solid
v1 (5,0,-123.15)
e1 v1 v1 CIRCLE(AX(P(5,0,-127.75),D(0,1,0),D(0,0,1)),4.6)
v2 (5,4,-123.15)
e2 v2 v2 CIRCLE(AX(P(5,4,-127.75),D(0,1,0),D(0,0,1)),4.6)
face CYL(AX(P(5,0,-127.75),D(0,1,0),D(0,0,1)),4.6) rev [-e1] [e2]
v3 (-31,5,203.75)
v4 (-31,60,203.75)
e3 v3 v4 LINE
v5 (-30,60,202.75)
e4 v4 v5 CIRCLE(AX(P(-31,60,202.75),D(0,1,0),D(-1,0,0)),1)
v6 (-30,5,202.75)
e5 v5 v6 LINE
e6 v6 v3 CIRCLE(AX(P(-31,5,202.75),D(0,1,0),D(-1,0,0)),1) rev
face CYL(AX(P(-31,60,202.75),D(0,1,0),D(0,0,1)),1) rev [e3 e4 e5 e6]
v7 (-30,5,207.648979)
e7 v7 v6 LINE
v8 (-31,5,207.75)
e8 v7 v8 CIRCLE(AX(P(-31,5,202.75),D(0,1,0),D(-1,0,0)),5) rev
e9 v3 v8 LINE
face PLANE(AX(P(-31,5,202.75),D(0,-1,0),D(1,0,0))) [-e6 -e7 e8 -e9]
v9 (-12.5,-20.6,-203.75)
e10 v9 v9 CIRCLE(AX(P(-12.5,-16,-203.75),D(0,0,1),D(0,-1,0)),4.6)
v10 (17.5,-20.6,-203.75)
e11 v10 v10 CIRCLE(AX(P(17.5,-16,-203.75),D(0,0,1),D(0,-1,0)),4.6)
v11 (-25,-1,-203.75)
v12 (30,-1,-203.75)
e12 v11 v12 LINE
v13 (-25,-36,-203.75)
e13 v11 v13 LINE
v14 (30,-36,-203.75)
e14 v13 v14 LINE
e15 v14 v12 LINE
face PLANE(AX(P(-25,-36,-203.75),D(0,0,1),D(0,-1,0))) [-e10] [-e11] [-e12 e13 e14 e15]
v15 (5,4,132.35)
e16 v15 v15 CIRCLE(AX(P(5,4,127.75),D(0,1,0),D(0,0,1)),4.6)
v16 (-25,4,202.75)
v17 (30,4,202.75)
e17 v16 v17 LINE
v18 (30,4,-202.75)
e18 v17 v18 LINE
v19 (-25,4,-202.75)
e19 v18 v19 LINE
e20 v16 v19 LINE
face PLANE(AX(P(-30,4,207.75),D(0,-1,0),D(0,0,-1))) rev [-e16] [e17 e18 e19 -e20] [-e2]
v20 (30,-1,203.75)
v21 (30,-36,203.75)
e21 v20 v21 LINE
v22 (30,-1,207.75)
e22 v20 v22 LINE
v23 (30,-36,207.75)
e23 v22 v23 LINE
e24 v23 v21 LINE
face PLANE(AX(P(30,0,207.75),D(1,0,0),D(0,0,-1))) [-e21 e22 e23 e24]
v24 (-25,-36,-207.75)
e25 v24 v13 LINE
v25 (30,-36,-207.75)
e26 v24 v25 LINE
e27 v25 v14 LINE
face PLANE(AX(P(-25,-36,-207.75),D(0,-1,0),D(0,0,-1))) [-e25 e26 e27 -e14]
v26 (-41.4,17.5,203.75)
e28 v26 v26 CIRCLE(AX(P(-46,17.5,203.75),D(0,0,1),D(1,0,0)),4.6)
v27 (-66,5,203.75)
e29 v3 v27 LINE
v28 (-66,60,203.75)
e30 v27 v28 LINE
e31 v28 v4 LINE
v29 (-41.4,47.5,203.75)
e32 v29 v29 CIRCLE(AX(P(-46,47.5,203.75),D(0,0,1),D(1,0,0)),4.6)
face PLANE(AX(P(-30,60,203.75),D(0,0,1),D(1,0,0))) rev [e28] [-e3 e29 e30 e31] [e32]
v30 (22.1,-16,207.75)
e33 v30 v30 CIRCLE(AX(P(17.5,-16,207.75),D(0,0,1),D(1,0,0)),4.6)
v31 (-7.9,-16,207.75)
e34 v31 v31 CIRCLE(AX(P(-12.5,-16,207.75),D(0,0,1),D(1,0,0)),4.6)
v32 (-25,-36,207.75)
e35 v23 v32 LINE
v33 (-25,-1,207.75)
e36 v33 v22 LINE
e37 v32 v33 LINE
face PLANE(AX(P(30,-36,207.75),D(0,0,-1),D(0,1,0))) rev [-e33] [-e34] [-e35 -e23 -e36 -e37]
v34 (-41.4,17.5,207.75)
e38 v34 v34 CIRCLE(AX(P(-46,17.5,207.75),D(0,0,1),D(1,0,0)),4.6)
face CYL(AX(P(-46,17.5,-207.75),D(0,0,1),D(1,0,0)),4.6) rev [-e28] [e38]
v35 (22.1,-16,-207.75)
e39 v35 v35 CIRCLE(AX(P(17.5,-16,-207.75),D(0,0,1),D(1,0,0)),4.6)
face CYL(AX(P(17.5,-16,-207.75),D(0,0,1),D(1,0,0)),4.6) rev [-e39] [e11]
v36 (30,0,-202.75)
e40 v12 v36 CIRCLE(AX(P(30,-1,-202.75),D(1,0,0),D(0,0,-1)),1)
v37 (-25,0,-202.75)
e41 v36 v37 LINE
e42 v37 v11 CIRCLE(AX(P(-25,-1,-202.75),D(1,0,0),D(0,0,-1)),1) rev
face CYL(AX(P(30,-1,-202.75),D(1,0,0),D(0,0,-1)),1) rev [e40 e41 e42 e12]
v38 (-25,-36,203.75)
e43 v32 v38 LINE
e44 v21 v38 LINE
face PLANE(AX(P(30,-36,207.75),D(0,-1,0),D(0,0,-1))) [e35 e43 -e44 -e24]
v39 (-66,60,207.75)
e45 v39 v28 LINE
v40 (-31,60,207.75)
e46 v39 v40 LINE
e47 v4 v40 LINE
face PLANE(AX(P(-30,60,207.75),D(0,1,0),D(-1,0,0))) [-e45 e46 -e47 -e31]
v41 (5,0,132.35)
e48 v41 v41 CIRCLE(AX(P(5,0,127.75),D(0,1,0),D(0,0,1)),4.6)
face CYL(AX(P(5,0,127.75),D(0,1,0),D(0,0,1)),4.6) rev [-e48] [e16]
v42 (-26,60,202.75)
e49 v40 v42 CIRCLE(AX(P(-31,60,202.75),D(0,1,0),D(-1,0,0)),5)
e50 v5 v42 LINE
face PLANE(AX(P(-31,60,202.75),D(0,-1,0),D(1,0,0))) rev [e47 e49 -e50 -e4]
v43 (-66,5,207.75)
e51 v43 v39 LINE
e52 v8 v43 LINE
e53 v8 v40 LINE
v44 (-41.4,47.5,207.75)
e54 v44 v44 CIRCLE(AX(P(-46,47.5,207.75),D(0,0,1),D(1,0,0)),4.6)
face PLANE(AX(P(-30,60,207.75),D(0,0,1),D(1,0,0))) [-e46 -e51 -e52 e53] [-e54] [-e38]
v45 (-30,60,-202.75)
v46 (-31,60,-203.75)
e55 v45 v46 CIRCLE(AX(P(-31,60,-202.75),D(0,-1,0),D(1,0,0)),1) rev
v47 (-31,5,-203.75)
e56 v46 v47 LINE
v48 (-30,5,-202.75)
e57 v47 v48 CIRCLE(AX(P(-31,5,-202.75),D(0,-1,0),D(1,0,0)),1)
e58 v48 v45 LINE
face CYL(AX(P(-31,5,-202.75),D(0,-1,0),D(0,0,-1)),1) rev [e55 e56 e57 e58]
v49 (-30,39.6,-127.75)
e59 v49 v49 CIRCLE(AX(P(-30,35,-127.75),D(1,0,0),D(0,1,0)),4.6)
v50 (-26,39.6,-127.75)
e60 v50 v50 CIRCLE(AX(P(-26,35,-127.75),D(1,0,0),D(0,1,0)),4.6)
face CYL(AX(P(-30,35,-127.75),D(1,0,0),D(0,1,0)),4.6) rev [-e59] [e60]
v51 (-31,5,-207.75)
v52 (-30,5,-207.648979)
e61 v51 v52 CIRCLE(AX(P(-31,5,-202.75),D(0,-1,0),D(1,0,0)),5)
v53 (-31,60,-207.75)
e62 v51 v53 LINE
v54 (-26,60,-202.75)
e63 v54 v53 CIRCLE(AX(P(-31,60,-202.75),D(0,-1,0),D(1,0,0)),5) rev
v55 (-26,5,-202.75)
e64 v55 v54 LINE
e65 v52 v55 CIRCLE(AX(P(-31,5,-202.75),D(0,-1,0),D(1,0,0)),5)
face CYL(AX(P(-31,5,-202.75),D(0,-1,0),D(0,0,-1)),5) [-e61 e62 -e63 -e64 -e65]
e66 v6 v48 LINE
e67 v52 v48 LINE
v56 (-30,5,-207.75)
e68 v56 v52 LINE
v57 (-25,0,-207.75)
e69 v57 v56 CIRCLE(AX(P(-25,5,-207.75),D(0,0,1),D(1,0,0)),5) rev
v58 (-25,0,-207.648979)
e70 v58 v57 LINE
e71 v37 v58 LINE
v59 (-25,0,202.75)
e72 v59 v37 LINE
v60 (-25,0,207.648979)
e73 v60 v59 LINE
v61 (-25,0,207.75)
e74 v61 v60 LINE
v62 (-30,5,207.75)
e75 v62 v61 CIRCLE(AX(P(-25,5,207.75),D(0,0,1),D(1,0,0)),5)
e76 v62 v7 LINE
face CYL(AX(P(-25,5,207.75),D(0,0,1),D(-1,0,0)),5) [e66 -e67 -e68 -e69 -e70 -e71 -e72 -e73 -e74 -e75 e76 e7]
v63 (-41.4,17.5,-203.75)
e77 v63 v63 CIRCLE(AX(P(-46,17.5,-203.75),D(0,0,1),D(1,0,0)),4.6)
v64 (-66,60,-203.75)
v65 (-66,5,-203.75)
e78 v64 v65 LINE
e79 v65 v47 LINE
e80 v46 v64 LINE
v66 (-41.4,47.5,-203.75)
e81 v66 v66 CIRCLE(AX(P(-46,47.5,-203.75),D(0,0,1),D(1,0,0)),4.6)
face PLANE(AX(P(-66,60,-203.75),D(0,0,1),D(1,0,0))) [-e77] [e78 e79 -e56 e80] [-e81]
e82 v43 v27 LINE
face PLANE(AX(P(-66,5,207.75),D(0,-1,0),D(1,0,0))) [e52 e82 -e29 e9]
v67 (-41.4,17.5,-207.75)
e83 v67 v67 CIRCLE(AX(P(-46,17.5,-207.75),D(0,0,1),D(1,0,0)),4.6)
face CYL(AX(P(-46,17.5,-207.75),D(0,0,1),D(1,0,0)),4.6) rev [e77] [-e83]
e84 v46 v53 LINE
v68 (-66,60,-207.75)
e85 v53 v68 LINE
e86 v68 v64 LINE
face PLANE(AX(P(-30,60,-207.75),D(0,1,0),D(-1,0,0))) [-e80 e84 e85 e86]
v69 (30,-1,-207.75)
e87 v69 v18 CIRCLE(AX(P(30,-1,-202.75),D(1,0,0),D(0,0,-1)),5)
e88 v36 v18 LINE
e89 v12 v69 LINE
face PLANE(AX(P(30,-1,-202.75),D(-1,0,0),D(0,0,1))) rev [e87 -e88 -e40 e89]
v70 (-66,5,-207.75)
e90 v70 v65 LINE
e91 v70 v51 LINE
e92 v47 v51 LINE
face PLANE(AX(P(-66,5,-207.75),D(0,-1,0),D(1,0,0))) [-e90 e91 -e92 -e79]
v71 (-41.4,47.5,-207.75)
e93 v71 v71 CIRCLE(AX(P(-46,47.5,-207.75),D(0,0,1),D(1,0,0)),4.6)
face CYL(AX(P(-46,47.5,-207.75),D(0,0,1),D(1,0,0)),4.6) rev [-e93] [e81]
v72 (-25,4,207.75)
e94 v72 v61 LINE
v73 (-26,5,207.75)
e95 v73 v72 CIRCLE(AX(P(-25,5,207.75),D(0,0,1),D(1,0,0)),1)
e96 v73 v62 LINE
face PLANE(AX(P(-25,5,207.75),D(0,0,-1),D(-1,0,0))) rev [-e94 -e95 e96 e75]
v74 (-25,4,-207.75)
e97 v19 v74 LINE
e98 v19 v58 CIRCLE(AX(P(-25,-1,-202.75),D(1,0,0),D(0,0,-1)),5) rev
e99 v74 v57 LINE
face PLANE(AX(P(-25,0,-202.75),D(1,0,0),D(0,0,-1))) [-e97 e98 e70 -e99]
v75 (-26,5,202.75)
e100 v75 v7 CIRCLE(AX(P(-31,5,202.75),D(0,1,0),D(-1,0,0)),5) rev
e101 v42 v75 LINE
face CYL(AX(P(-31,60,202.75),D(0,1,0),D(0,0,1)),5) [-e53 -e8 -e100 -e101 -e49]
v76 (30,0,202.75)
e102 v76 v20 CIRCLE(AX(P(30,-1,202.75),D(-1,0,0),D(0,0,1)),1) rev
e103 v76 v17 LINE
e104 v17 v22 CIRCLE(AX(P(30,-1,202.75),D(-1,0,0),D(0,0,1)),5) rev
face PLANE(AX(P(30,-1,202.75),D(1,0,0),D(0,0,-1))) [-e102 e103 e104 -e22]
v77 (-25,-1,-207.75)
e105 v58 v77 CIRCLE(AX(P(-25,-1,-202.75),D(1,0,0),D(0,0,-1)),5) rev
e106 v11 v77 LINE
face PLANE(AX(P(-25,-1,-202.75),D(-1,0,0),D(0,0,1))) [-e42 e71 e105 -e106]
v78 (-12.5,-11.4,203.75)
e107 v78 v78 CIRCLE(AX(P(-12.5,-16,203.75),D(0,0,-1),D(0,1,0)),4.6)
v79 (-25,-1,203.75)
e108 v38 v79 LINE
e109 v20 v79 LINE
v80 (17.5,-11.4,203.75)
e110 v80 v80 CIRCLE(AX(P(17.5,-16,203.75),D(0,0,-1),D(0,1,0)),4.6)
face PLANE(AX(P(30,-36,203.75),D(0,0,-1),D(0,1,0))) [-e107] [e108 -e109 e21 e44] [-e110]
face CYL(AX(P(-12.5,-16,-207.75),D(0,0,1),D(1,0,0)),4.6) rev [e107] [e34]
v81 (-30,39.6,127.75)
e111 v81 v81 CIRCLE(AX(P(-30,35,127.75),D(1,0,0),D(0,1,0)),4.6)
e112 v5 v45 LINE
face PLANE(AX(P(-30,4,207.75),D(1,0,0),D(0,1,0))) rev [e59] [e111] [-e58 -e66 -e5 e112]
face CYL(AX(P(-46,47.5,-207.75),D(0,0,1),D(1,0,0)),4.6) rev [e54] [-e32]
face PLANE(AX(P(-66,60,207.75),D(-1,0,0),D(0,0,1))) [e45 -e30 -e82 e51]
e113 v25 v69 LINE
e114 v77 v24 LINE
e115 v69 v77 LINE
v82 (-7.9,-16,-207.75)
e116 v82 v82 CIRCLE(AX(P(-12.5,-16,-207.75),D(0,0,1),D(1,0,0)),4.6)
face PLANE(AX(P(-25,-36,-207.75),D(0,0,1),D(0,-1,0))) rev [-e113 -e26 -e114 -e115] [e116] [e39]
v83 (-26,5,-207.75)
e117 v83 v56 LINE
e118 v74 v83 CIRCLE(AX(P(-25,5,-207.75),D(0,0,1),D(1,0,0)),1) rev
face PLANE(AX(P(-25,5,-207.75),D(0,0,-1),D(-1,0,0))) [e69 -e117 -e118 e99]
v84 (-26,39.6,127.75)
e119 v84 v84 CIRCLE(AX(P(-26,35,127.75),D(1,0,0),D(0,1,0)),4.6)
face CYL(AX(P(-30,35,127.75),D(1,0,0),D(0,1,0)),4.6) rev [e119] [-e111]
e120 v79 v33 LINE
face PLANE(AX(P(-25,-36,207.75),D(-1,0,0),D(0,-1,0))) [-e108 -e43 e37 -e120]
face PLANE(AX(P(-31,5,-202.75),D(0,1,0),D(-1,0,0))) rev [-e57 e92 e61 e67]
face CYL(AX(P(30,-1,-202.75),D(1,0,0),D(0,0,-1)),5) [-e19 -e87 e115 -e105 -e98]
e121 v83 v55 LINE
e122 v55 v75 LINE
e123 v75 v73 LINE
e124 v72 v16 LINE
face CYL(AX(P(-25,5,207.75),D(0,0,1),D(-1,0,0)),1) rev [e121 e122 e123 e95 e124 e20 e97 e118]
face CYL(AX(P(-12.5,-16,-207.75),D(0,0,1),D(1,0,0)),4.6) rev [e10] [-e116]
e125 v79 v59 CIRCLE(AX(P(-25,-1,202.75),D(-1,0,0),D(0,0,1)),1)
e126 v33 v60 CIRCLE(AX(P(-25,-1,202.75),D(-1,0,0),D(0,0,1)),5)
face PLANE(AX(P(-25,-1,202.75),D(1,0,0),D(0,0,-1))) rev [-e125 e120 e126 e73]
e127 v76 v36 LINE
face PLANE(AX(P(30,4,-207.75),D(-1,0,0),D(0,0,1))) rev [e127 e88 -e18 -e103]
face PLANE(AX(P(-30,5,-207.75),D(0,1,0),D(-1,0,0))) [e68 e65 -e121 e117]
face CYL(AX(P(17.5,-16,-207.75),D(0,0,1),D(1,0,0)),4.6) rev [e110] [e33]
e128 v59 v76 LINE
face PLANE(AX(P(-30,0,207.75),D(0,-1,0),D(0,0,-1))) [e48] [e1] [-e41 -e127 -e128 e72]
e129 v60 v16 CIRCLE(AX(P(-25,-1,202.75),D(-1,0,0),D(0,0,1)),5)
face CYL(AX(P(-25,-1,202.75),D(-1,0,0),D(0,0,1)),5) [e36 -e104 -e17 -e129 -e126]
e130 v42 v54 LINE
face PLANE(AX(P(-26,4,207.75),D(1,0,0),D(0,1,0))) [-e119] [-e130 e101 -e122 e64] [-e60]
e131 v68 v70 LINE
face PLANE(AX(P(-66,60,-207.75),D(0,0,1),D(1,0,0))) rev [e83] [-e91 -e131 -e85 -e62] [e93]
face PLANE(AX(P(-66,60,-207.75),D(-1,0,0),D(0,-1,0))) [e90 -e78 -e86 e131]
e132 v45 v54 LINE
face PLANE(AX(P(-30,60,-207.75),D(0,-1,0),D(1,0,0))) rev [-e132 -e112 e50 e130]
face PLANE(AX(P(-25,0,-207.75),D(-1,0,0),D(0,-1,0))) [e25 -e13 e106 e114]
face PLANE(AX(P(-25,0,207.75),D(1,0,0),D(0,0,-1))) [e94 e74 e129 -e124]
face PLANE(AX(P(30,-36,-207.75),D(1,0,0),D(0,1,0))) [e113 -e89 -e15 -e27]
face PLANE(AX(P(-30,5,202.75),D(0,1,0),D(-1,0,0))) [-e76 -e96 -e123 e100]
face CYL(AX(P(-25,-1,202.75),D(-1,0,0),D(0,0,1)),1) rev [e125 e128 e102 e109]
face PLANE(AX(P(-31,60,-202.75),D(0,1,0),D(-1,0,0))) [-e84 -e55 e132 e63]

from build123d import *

# Parameters (mm, degrees)
SKETCH1_W                      = 60
SKETCH1_H                      = 415.5
BASE_FLANGE1_DEPTH             = 4
EDGE_FLANGE1_STRIP_W           = 18
EDGE_FLANGE1_STRIP_H           = 4
EDGE_FLANGE1_STRIP_CUT_DEPTH   = 415.5
EDGE_FLANGE1_DEPTH             = 415.5
EDGE_FLANGE2_STRIP_W           = 18
EDGE_FLANGE2_STRIP_H           = 4
EDGE_FLANGE2_STRIP_CUT_DEPTH   = 55
EDGE_FLANGE2_STRIP_2_W         = 18
EDGE_FLANGE2_STRIP_2_H         = 4
EDGE_FLANGE2_STRIP_CUT_2_DEPTH = 55
EDGE_FLANGE2_STRIP_3_W         = 18
EDGE_FLANGE2_STRIP_3_H         = 4
EDGE_FLANGE2_STRIP_CUT_3_DEPTH = 55
EDGE_FLANGE2_STRIP_4_W         = 18
EDGE_FLANGE2_STRIP_4_H         = 4
EDGE_FLANGE2_STRIP_CUT_4_DEPTH = 55
EDGE_FLANGE2_DEPTH             = 55
EDGE_FLANGE2_BEND_DEPTH        = 55
EDGE_FLANGE2_BEND_2_DEPTH      = 55
EDGE_FLANGE2_BEND_3_DEPTH      = 55
SKETCH18_R                     = 4.6
EXTRUDE1_DEPTH                 = 425.966175125
SKETCH19_R                     = 4.6
EXTRUDE2_DEPTH                 = 4
SKETCH20_R                     = 4.6
EXTRUDE3_DEPTH                 = 4


# Sheet-metal steps are written as plain solids
with BuildPart() as part:
    # Sketch1 → Base-Flange1 (new body)
    with BuildSketch(Plane(origin=(0, 0, 0), x_dir=(1, 0, 0), z_dir=(0, 1, 0))):
        Rectangle(SKETCH1_W, SKETCH1_H)
    extrude(amount=BASE_FLANGE1_DEPTH)

    # Edge-Flange1 strip (across the edge) → Edge-Flange1 strip cut (cut)
    with BuildSketch(Plane(origin=(-30, 4, -207.75), x_dir=(1, 0, 0), z_dir=(0, 0, 1))):
        with Locations((-4, -2)):
            Rectangle(EDGE_FLANGE1_STRIP_W, EDGE_FLANGE1_STRIP_H)
    extrude(amount=EDGE_FLANGE1_STRIP_CUT_DEPTH, mode=Mode.SUBTRACT)

    # Edge-Flange1 section (across the edge) → Edge-Flange1 (add)
    with BuildSketch(Plane(origin=(-30, 4, -207.75), x_dir=(1, 0, 0), z_dir=(0, 0, 1))):
        with BuildLine():
            Line((0, 1), (0, 56))
            Line((0, 56), (4, 56))
            Line((4, 56), (4, 1))
            ThreePointArc((4, 1), (4.292893219, 0.292893219), (5, 0))
            Line((5, 0), (5, -4))
            ThreePointArc((5, -4), (1.464466094, -2.535533906), (0, 1))
        make_face()
    extrude(amount=EDGE_FLANGE1_DEPTH)

    # Edge-Flange2 strip (across the edge) → Edge-Flange2 strip cut (cut)
    with BuildSketch(Plane(origin=(-30, 5, 207.75), x_dir=(0, 0, -1), z_dir=(0, 1, 0))):
        with Locations((-4, -2)):
            Rectangle(EDGE_FLANGE2_STRIP_W, EDGE_FLANGE2_STRIP_H)
    extrude(amount=EDGE_FLANGE2_STRIP_CUT_DEPTH, mode=Mode.SUBTRACT)

    # Edge-Flange2 strip 2 (across the edge) → Edge-Flange2 strip cut 2 (cut)
    with BuildSketch(Plane(origin=(30, 0, 207.75), x_dir=(0, 0, -1), z_dir=(-1, 0, 0))):
        with Locations((-4, -2)):
            Rectangle(EDGE_FLANGE2_STRIP_2_W, EDGE_FLANGE2_STRIP_2_H)
    extrude(amount=EDGE_FLANGE2_STRIP_CUT_2_DEPTH, mode=Mode.SUBTRACT)

    # Edge-Flange2 strip 3 (across the edge) → Edge-Flange2 strip cut 3 (cut)
    with BuildSketch(Plane(origin=(-30, 60, -207.75), x_dir=(0, 0, 1), z_dir=(0, -1, 0))):
        with Locations((-4, -2)):
            Rectangle(EDGE_FLANGE2_STRIP_3_W, EDGE_FLANGE2_STRIP_3_H)
    extrude(amount=EDGE_FLANGE2_STRIP_CUT_3_DEPTH, mode=Mode.SUBTRACT)

    # Edge-Flange2 strip 4 (across the edge) → Edge-Flange2 strip cut 4 (cut)
    with BuildSketch(Plane(origin=(-25, 0, -207.75), x_dir=(0, 0, 1), z_dir=(1, 0, 0))):
        with Locations((-4, -2)):
            Rectangle(EDGE_FLANGE2_STRIP_4_W, EDGE_FLANGE2_STRIP_4_H)
    extrude(amount=EDGE_FLANGE2_STRIP_CUT_4_DEPTH, mode=Mode.SUBTRACT)

    # Edge-Flange2 section (across the edge) → Edge-Flange2 (add)
    with BuildSketch(Plane(origin=(-30, 5, 207.75), x_dir=(0, 0, -1), z_dir=(0, 1, 0))):
        with BuildLine():
            Line((0, 1), (0, 36))
            Line((0, 36), (4, 36))
            Line((4, 36), (4, 1))
            ThreePointArc((4, 1), (4.292893219, 0.292893219), (5, 0))
            Line((5, 0), (5, -4))
            ThreePointArc((5, -4), (1.464466094, -2.535533906), (0, 1))
        make_face()
    extrude(amount=EDGE_FLANGE2_DEPTH)

    # Edge-Flange2 section 2 (across the edge) → Edge-Flange2 bend (add)
    with BuildSketch(Plane(origin=(30, 0, 207.75), x_dir=(0, 0, -1), z_dir=(-1, 0, 0))):
        with BuildLine():
            Line((0, 1), (0, 36))
            Line((0, 36), (4, 36))
            Line((4, 36), (4, 1))
            ThreePointArc((4, 1), (4.292893219, 0.292893219), (5, 0))
            Line((5, 0), (5, -4))
            ThreePointArc((5, -4), (1.464466094, -2.535533906), (0, 1))
        make_face()
    extrude(amount=EDGE_FLANGE2_BEND_DEPTH)

    # Edge-Flange2 section 3 (across the edge) → Edge-Flange2 bend 2 (add)
    with BuildSketch(Plane(origin=(-30, 60, -207.75), x_dir=(0, 0, 1), z_dir=(0, -1, 0))):
        with BuildLine():
            Line((0, 1), (0, 36))
            Line((0, 36), (4, 36))
            Line((4, 36), (4, 1))
            ThreePointArc((4, 1), (4.292893219, 0.292893219), (5, 0))
            Line((5, 0), (5, -4))
            ThreePointArc((5, -4), (1.464466094, -2.535533906), (0, 1))
        make_face()
    extrude(amount=EDGE_FLANGE2_BEND_2_DEPTH)

    # Edge-Flange2 section 4 (across the edge) → Edge-Flange2 bend 3 (add)
    with BuildSketch(Plane(origin=(-25, 0, -207.75), x_dir=(0, 0, 1), z_dir=(1, 0, 0))):
        with BuildLine():
            Line((0, 1), (0, 36))
            Line((0, 36), (4, 36))
            Line((4, 36), (4, 1))
            ThreePointArc((4, 1), (4.292893219, 0.292893219), (5, 0))
            Line((5, 0), (5, -4))
            ThreePointArc((5, -4), (1.464466094, -2.535533906), (0, 1))
        make_face()
    extrude(amount=EDGE_FLANGE2_BEND_3_DEPTH)

    # Sketch18 → Extrude1 (cut, through all)
    with BuildSketch(Plane.XY.offset(207.75)):
        with Locations((-46, 47.5)):
            Circle(SKETCH18_R)
        with Locations((-46, 17.5)):
            Circle(SKETCH18_R)
        with Locations((-12.5, -16)):
            Circle(SKETCH18_R)
        with Locations((17.5, -16)):
            Circle(SKETCH18_R)
    extrude(amount=-EXTRUDE1_DEPTH, mode=Mode.SUBTRACT)

    # Sketch19 → Extrude2 (cut)
    with BuildSketch(Plane(origin=(-26, 0, 0), x_dir=(0, 0, -1), z_dir=(1, 0, 0))):
        with Locations(Location((-127.75, 35, 0), (0, 0, 90))):
            Circle(SKETCH19_R)
        with Locations(Location((127.75, 35, 0), (0, 0, 90))):
            Circle(SKETCH19_R)
    extrude(amount=-EXTRUDE2_DEPTH, mode=Mode.SUBTRACT)

    # Sketch20 → Extrude3 (cut)
    with BuildSketch(Plane(origin=(0, 4, 0), x_dir=(1, 0, 0), z_dir=(0, 1, 0))):
        with Locations(Location((5, 127.75, 0), (0, 0, 270))):
            Circle(SKETCH20_R)
        with Locations(Location((5, -127.75, 0), (0, 0, 270))):
            Circle(SKETCH20_R)
    extrude(amount=-EXTRUDE3_DEPTH, mode=Mode.SUBTRACT)


solid = part.part
